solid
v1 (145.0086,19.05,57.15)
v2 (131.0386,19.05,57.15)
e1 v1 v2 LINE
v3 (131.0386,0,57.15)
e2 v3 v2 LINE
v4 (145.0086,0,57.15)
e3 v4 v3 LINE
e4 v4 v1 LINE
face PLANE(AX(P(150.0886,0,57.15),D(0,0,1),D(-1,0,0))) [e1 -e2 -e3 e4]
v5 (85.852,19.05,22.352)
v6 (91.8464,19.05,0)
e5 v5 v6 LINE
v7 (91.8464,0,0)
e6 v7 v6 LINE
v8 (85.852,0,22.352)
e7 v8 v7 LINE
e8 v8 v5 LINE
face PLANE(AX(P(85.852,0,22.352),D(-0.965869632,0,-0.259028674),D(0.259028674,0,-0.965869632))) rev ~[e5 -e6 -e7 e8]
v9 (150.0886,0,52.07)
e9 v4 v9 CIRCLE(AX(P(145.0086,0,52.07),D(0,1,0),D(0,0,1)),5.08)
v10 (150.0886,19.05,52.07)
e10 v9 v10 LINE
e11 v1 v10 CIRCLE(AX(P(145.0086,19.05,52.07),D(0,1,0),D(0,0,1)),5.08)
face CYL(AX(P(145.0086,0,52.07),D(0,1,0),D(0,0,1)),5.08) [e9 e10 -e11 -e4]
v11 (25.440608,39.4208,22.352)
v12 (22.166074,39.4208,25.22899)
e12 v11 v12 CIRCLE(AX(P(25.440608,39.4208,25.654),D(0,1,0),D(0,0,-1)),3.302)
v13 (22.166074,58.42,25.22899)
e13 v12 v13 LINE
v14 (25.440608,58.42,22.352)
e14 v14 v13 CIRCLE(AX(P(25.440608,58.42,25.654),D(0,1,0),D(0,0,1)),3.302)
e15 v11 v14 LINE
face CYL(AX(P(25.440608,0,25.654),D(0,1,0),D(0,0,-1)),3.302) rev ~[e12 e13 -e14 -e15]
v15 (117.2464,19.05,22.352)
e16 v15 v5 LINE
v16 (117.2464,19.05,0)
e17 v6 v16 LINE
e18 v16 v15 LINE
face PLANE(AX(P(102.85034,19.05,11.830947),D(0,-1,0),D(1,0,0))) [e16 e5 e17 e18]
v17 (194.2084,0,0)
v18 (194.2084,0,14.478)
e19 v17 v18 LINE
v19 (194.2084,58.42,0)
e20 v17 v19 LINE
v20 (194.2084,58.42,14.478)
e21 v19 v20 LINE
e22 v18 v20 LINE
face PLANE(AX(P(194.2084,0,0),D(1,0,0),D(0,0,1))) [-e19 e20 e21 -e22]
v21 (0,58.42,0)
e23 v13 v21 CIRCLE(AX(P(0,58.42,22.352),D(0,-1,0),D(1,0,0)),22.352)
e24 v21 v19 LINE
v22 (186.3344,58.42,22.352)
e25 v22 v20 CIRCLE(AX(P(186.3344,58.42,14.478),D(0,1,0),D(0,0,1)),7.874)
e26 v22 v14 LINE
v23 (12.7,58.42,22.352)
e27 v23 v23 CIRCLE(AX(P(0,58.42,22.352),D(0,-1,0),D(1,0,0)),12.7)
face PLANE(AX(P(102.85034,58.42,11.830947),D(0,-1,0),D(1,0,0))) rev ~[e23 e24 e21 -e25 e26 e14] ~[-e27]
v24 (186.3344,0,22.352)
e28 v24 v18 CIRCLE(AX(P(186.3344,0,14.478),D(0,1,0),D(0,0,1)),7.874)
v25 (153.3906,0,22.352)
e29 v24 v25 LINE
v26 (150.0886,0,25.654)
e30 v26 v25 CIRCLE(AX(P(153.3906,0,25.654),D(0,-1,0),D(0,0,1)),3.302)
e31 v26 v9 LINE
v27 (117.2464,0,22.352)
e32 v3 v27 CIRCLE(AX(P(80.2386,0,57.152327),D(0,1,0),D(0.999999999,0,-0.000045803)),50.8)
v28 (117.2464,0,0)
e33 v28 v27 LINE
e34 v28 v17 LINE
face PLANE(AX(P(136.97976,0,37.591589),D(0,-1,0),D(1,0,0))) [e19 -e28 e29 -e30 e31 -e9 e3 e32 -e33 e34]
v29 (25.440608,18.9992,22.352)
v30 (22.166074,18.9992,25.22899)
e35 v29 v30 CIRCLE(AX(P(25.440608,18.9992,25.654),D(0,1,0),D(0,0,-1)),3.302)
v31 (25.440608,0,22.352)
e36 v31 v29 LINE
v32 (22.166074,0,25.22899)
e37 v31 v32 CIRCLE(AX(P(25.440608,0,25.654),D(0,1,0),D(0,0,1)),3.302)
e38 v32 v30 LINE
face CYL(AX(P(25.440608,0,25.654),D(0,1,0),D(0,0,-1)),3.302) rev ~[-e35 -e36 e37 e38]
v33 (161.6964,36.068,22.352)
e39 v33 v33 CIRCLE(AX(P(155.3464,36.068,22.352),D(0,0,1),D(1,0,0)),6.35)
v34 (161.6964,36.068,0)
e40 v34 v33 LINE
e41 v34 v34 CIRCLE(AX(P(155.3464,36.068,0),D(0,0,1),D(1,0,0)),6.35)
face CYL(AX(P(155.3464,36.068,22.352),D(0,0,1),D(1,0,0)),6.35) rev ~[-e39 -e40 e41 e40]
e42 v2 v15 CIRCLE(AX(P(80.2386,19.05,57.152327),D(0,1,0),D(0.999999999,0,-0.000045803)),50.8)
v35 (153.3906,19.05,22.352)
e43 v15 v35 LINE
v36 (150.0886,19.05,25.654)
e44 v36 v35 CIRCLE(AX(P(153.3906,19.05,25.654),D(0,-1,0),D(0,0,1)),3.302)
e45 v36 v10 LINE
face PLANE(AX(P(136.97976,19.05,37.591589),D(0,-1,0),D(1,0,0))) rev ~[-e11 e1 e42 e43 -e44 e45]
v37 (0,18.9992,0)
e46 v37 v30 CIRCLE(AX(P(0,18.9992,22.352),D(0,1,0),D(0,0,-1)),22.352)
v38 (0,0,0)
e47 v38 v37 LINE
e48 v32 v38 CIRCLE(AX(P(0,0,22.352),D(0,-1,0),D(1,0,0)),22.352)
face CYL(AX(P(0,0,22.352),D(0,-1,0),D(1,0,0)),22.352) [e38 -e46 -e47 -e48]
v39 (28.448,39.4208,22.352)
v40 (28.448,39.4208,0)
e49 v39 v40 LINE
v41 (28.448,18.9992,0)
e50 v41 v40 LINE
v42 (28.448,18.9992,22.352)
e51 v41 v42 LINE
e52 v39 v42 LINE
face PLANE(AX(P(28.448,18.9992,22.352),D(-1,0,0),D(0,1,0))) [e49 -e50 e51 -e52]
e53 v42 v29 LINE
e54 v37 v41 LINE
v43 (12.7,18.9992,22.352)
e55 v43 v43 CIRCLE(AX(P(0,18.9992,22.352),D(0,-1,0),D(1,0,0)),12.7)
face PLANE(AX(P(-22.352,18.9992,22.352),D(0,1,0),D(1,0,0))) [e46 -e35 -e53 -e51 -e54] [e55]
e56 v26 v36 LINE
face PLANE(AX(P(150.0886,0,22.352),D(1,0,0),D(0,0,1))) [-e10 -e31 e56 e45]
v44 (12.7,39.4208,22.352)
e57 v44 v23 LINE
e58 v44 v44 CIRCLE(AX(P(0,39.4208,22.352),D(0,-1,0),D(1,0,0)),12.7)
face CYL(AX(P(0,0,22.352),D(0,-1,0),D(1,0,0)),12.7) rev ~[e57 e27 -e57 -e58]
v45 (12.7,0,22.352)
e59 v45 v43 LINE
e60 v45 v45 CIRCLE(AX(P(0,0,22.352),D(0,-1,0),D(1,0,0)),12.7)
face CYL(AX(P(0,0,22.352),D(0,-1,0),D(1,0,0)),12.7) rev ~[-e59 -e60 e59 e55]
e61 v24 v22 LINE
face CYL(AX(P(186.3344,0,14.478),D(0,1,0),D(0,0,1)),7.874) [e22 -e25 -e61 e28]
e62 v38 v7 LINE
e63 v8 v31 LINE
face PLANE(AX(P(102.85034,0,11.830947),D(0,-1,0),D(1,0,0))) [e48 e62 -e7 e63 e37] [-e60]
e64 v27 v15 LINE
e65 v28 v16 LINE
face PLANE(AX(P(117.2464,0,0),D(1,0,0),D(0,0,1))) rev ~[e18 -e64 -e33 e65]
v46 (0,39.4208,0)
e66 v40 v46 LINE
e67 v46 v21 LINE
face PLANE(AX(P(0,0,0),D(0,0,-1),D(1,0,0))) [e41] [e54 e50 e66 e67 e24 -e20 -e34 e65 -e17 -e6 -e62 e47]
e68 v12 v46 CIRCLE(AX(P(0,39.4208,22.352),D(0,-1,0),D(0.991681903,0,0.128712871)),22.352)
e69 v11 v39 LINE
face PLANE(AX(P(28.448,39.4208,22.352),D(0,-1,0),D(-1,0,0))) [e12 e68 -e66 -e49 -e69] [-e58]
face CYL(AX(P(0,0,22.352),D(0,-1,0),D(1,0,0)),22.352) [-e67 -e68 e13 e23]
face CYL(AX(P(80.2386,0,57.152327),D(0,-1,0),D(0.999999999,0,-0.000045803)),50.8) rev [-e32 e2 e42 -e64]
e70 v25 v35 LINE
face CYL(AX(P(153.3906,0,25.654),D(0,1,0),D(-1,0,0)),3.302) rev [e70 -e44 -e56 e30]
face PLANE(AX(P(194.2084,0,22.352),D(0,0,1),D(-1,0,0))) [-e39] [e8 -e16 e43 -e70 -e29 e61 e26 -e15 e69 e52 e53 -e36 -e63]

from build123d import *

# Parameters (mm, degrees)
F0_R     = 12.7
F1_DEPTH = 58.42
F2_DEPTH = 19.05
F3_DEPTH = 19.05
F4_R     = 6.35
F5_DEPTH = 38.1
F6_R     = 3.302
F7_R     = 5.08
F8_R     = 7.874
F4_W     = 44.704
F4_H     = 20.4216
F4_W_2   = 6.096
F9_DEPTH = 38.1


# Not quite as in the source:
# - a feature names something its author has since deleted; it is built from what else it names


with BuildPart() as f1:
    # F0 (on Front) → F1 (new body)
    with BuildSketch(Plane.XZ):
        Polygon((85.852, 22.352), (91.8464, 0), (117.2464, 0), (117.2464, 22.352), align=None)
        with BuildLine():
            ThreePointArc((22.352, 22.352), (15.8052507731, 6.5467492269), (0, 0))
            Line((0, 0), (91.8464, 0))
            Line((91.8464, 0), (85.852, 22.352))
            Line((85.852, 22.352), (22.352, 22.352))
        make_face()
        Polygon((117.2464, 22.352), (117.2464, 0), (194.2084, 0), (194.2084, 22.352), (150.0886, 22.352), align=None)
        with BuildLine():
            ThreePointArc((22.352, 22.352), (-15.8052507731, 38.1572507731), (0, 0))
            ThreePointArc((0, 0), (15.8052507731, 6.5467492269), (22.352, 22.352))
        make_face()
        with Locations((0, 22.352)):
            Circle(F0_R, mode=Mode.SUBTRACT)
    extrude(amount=-F1_DEPTH)

    # F0 (on Front) → F2 (cut)
    with BuildSketch(Plane.XZ):
        Polygon((85.852, 22.352), (91.8464, 0), (117.2464, 0), (117.2464, 22.352), align=None)
    extrude(amount=-F2_DEPTH, mode=Mode.SUBTRACT)

    # F0 (on Front) → F3 (join)
    with BuildSketch(Plane.XZ):
        with BuildLine():
            ThreePointArc((131.0386, 57.15), (127.4644153616, 38.4343576341), (117.2464, 22.352))
            Line((117.2464, 22.352), (150.0886, 22.352))
            Line((150.0886, 22.352), (150.0886, 57.15))
            Line((150.0886, 57.15), (131.0386, 57.15))
        make_face()
    extrude(amount=-F3_DEPTH)

    # F4 (on face) → F5 (cut, symmetric)
    with BuildSketch(Plane.XY.offset(22.352)):
        with Locations((155.3464, 36.068)):
            Circle(F4_R)
    extrude(amount=F5_DEPTH, both=True, mode=Mode.SUBTRACT)

    # F6
    f6_edges = [f1.edges().sort_by_distance(p)[0] for p in [
        (22.352, 29.21, 22.352),
        (150.0886, 9.525, 22.352),
    ]]
    fillet(f6_edges, radius=F6_R)

    # F7
    f7_edges = [f1.edges().sort_by_distance(p)[0] for p in [
        (150.0886, 9.525, 57.15),
    ]]
    fillet(f7_edges, radius=F7_R)

    # F8
    f8_edges = [f1.edges().sort_by_distance(p)[0] for p in [
        (194.2084, 29.21, 22.352),
    ]]
    fillet(f8_edges, radius=F8_R)

    # F4 (on face) → F9 (cut, symmetric)
    with BuildSketch(Plane.XY.offset(22.352)):
        with Locations((0, 29.21)):
            Rectangle(F4_W, F4_H)
        with Locations((25.4, 29.21)):
            Rectangle(F4_W_2, F4_H)
        with Locations((155.3464, 36.068)):
            Circle(F4_R)
    extrude(amount=F9_DEPTH, both=True, mode=Mode.SUBTRACT)


solid = f1.part
